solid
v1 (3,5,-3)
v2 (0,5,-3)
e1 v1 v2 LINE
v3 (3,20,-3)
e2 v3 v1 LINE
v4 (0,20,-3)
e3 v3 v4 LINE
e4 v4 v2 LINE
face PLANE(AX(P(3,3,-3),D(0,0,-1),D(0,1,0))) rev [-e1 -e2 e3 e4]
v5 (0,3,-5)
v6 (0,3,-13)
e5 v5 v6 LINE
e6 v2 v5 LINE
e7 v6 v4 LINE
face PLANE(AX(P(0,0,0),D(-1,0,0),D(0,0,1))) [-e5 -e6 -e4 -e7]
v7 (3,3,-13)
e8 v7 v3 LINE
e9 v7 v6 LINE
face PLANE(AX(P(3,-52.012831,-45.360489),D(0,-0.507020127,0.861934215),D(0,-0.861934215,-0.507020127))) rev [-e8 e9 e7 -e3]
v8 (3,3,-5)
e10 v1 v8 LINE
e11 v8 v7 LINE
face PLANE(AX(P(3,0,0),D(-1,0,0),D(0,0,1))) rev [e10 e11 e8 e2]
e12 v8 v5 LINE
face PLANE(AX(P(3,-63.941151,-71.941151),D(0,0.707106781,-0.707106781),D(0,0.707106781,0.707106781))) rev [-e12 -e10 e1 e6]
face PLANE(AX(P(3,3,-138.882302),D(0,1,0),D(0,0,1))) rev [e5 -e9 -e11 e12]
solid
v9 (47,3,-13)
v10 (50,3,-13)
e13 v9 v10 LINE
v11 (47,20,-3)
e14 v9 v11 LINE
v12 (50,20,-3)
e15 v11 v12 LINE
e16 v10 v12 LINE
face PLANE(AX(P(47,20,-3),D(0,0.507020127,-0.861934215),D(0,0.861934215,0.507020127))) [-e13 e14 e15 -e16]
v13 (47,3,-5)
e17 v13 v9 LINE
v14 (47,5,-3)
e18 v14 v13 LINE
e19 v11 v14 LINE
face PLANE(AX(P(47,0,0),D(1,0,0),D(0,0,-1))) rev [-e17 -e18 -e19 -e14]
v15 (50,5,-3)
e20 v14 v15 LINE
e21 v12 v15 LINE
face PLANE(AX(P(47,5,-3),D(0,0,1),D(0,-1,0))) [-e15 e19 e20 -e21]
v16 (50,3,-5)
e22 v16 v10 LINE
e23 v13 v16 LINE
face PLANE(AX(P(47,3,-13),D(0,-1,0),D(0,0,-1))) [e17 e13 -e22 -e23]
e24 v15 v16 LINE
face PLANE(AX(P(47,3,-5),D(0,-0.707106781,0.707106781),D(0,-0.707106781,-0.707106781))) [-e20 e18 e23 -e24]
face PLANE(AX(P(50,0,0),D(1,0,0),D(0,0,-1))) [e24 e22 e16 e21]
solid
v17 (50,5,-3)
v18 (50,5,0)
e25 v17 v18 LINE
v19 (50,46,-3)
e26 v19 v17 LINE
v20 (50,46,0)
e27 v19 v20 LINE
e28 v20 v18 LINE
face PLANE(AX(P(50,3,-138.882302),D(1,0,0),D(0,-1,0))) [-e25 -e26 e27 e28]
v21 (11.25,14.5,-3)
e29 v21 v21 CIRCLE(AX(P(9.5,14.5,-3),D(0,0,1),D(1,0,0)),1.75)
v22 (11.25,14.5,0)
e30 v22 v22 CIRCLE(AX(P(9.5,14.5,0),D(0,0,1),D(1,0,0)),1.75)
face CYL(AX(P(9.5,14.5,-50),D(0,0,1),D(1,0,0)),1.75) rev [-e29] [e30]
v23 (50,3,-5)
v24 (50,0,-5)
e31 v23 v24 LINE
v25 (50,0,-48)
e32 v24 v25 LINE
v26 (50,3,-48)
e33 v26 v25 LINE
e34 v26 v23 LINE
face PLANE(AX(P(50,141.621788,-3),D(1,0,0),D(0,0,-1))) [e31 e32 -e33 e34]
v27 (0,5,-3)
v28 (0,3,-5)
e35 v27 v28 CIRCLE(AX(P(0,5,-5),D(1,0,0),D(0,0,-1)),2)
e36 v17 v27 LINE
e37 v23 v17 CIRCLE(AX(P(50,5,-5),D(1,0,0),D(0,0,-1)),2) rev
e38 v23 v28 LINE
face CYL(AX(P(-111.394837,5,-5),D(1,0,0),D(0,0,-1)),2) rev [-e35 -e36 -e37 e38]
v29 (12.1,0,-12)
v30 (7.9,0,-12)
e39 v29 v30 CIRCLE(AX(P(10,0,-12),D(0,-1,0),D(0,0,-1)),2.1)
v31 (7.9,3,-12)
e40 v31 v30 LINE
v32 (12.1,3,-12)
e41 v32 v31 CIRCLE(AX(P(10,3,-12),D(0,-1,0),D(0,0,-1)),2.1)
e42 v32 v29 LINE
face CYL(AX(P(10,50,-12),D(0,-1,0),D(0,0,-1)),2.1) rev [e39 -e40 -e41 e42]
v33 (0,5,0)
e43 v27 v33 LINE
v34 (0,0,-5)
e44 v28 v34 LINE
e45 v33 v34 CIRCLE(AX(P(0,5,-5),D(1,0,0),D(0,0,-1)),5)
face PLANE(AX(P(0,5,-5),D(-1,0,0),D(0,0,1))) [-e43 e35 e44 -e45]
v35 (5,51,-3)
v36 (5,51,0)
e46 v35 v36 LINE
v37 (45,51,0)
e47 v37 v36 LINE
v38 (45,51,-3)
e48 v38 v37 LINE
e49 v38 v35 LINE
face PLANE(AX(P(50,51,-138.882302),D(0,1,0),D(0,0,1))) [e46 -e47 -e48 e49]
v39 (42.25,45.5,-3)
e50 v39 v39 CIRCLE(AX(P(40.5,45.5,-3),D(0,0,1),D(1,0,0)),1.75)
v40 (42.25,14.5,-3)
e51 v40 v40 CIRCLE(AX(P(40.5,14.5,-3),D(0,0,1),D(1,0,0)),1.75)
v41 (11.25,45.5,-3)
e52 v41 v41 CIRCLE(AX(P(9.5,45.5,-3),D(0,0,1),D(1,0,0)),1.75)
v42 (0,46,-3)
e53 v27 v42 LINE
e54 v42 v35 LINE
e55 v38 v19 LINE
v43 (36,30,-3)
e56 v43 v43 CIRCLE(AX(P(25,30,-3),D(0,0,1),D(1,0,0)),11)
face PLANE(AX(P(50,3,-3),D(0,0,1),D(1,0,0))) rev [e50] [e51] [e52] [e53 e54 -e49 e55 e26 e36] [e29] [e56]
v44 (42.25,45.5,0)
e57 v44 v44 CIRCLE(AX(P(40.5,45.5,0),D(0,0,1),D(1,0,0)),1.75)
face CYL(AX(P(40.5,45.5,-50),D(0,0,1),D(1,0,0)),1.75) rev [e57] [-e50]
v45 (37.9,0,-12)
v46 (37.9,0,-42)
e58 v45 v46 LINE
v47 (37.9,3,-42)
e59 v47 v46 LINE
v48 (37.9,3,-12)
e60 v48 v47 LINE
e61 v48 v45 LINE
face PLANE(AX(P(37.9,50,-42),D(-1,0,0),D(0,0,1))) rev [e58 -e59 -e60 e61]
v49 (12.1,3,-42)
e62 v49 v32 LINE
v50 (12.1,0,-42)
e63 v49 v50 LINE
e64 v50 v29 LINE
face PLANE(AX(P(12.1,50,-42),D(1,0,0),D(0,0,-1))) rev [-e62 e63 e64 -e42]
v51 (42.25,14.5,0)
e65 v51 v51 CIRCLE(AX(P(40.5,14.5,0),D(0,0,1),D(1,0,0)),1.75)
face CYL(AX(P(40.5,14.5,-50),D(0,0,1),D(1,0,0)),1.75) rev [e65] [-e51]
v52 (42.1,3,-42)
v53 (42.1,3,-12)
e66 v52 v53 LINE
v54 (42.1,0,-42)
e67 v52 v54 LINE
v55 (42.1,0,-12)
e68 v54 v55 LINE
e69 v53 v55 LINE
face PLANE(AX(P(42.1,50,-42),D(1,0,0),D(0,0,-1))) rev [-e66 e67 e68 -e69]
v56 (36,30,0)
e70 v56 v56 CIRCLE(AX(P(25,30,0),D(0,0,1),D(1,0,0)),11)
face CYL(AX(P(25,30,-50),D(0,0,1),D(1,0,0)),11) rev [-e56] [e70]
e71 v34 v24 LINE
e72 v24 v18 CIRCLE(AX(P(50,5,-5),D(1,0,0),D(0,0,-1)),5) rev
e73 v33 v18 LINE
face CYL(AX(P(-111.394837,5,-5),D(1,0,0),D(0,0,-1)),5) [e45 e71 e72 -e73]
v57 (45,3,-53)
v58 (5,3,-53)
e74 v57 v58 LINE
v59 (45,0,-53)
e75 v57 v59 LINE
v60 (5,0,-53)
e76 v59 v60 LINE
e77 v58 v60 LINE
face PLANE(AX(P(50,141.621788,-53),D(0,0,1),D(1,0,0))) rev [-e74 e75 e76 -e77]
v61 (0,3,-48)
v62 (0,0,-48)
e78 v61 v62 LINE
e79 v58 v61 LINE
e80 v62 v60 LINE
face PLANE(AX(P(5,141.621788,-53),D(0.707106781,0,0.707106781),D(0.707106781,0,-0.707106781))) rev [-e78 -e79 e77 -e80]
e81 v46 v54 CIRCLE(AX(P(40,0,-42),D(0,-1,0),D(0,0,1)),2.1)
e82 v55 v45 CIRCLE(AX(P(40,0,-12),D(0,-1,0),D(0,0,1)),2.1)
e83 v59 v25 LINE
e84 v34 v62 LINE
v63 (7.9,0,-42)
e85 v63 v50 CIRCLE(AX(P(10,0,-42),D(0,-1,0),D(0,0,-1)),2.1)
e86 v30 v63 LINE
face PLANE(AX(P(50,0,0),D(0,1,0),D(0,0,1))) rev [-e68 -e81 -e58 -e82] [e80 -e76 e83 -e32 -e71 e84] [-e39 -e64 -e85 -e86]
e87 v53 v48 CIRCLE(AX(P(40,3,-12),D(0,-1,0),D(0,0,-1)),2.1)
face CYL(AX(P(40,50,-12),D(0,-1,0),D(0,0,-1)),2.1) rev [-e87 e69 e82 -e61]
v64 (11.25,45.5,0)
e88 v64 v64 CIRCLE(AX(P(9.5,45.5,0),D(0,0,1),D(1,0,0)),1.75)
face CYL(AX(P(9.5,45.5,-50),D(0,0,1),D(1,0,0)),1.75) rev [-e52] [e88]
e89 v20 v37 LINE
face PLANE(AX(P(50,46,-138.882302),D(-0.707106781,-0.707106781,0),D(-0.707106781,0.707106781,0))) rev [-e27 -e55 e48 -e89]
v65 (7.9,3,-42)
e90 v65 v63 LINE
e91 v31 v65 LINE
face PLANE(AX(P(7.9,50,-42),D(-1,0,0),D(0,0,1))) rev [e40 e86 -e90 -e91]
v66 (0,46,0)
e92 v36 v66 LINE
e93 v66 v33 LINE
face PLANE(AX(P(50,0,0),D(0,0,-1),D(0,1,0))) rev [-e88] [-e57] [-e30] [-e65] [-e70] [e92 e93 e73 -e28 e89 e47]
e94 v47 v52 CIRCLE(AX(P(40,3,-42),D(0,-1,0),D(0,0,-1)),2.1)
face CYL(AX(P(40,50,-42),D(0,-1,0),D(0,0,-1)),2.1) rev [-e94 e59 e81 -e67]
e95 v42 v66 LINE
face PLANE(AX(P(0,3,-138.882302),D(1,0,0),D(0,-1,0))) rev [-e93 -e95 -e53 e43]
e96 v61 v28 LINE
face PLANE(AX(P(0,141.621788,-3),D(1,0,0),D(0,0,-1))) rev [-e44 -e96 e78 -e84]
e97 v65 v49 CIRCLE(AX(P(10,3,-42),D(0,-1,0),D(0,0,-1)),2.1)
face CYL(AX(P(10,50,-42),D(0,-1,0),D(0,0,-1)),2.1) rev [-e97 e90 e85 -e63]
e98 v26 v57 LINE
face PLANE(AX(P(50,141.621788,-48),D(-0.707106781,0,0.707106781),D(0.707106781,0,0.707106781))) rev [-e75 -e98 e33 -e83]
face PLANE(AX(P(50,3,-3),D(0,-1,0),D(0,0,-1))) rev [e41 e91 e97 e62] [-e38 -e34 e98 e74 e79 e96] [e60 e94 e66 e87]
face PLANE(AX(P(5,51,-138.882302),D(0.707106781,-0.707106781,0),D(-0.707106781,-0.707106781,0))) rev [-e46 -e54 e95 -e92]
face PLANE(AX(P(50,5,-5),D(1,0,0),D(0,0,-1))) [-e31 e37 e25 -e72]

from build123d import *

# Parameters (mm, degrees)
BOSS_EXTRUDE2_DEPTH          = 50
SKETCH4_R                    = 11
SKETCH4_R_2                  = 1.75
CUT_EXTRUDE1_DEPTH           = 50
CHAMFER1_SIZE                = 5
CUT_EXTRUDE2_DEPTH           = 50
FLATTEN_BENDS1_START         = 3
FLATTEN_BENDS1_OUTLINE_W     = 50
FLATTEN_BENDS1_OUTLINE_H     = 3
FLATTEN_BENDS1_DEPTH         = 48
FLATTEN_BENDS1_2_OUTLINE_R   = 1.75
FLATTEN_BENDS1_2_OUTLINE_R_2 = 11
FLATTEN_BENDS1_2_DEPTH       = 3
PROCESS_BENDS1_START         = -0.067055507
PROCESS_BENDS1_OUTLINE_W     = 50
PROCESS_BENDS1_OUTLINE_H     = 3
PROCESS_BENDS1_DEPTH         = 46.564842651
PROCESS_BENDS1_START_2       = -3
PROCESS_BENDS1_2_OUTLINE_R   = 1.75
PROCESS_BENDS1_2_OUTLINE_R_2 = 11
PROCESS_BENDS1_2_DEPTH       = 2.5137
PROCESS_BENDS1_START_3       = -5
PROCESS_BENDS1_3_OUTLINE_R   = 1.75
PROCESS_BENDS1_3_OUTLINE_R_2 = 11
PROCESS_BENDS1_3_DEPTH       = 5
PROCESS_BENDS1_4_DEPTH       = 50
BOSS_EXTRUDE3_DEPTH          = 3
BOSS_EXTRUDE4_START          = -50
BOSS_EXTRUDE4_DEPTH          = 3


with BuildPart() as part:
    # Sketch3 → Boss-Extrude2 (new body)
    with BuildSketch(Plane(origin=(0, 0, 0), x_dir=(0, 0, -1), z_dir=(1, 0, 0))):
        Polygon((0, 0), (0, 51), (3, 51), (3, 3), (53, 3), (53, 0), align=None)
    extrude(amount=BOSS_EXTRUDE2_DEPTH)

    # Sketch4 → Cut-Extrude1 (cut)
    with BuildSketch(Plane.XY):
        with Locations((25, 30)):
            Circle(SKETCH4_R)
        with Locations((9.5, 45.5)):
            Circle(SKETCH4_R_2)
        with Locations((40.5, 45.5)):
            Circle(SKETCH4_R_2)
        with Locations((40.5, 14.5)):
            Circle(SKETCH4_R_2)
        with Locations((9.5, 14.5)):
            Circle(SKETCH4_R_2)
    extrude(amount=-CUT_EXTRUDE1_DEPTH, mode=Mode.SUBTRACT)

    # Chamfer1
    chamfer1_edges = [part.edges().sort_by_distance(p)[0] for p in [
        (50, 51, -1.5),
        (0, 51, -1.5),
        (0, 1.5, -53),
        (50, 1.5, -53),
    ]]
    chamfer(chamfer1_edges, length=CHAMFER1_SIZE)

    # Sketch7 → Cut-Extrude2 (cut)
    with BuildSketch(Plane.XZ):
        with BuildLine():
            Line((7.9, -42), (7.9, -12))
            ThreePointArc((7.9, -12), (10, -9.9), (12.1, -12))
            Line((12.1, -12), (12.1, -42))
            ThreePointArc((12.1, -42), (10, -44.1), (7.9, -42))
        make_face()
        with BuildLine():
            Line((42.1, -42), (42.1, -12))
            ThreePointArc((42.1, -12), (40, -9.9), (37.9, -12))
            Line((37.9, -12), (37.9, -42))
            ThreePointArc((37.9, -42), (40, -44.1), (42.1, -42))
        make_face()
    extrude(amount=-CUT_EXTRUDE2_DEPTH, mode=Mode.SUBTRACT)

    # Flatten-Bends1: read off the stored shape, not the designer's step
    # Flatten-Bends1 outline → Flatten-Bends1 (cut)
    with BuildSketch(Plane(origin=(0, 0, 0), x_dir=(1, 0, 0), z_dir=(0, 1, 0)).offset(FLATTEN_BENDS1_START)):
        with Locations((25, 1.5)):
            Rectangle(FLATTEN_BENDS1_OUTLINE_W, FLATTEN_BENDS1_OUTLINE_H)
    extrude(amount=FLATTEN_BENDS1_DEPTH, mode=Mode.SUBTRACT)

    # Flatten-Bends1 2 outline → Flatten-Bends1 2 (add)
    with BuildSketch(Plane(origin=(0, 0, 0), x_dir=(1, 0, 0), z_dir=(0, 1, 0))):
        Polygon((0, 0), (0, -41.497787144), (5, -46.497787144), (45, -46.497787144), (50, -41.497787144), (50, 0), align=None)
        with Locations((9.5, -40.997787144)):
            Circle(FLATTEN_BENDS1_2_OUTLINE_R, mode=Mode.SUBTRACT)
        with Locations((40.5, -40.997787144)):
            Circle(FLATTEN_BENDS1_2_OUTLINE_R, mode=Mode.SUBTRACT)
        with Locations((25, -25.497787144)):
            Circle(FLATTEN_BENDS1_2_OUTLINE_R_2, mode=Mode.SUBTRACT)
        with Locations((9.5, -9.997787144)):
            Circle(FLATTEN_BENDS1_2_OUTLINE_R, mode=Mode.SUBTRACT)
        with Locations((40.5, -9.997787144)):
            Circle(FLATTEN_BENDS1_2_OUTLINE_R, mode=Mode.SUBTRACT)
    extrude(amount=FLATTEN_BENDS1_2_DEPTH)

    # Process-Bends1: read off the stored shape, not the designer's step
    # Process-Bends1 outline → Process-Bends1 (cut)
    with BuildSketch(Plane.XY.offset(PROCESS_BENDS1_START)):
        with Locations((25, 1.5)):
            Rectangle(PROCESS_BENDS1_OUTLINE_W, PROCESS_BENDS1_OUTLINE_H)
    extrude(amount=PROCESS_BENDS1_DEPTH, mode=Mode.SUBTRACT)

    # Process-Bends1 2 outline → Process-Bends1 2 (add)
    with BuildSketch(Plane.XY.offset(PROCESS_BENDS1_START_2)):
        Polygon((0, 46), (0, 3), (50, 3), (50, 46), (45, 51), (5, 51), align=None)
        with Locations((9.5, 14.5)):
            Circle(PROCESS_BENDS1_2_OUTLINE_R, mode=Mode.SUBTRACT)
        with Locations((40.5, 14.5)):
            Circle(PROCESS_BENDS1_2_OUTLINE_R, mode=Mode.SUBTRACT)
        with Locations((9.5, 45.5)):
            Circle(PROCESS_BENDS1_2_OUTLINE_R, mode=Mode.SUBTRACT)
        with Locations((25, 30)):
            Circle(PROCESS_BENDS1_2_OUTLINE_R_2, mode=Mode.SUBTRACT)
        with Locations((40.5, 45.5)):
            Circle(PROCESS_BENDS1_2_OUTLINE_R, mode=Mode.SUBTRACT)
    extrude(amount=PROCESS_BENDS1_2_DEPTH)

    # Process-Bends1 3 outline → Process-Bends1 3 (add)
    with BuildSketch(Plane.XY.offset(PROCESS_BENDS1_START_3)):
        Polygon((0, 46), (0, 3), (50, 3), (50, 46), (45, 51), (5, 51), align=None)
        with Locations((9.5, 14.5)):
            Circle(PROCESS_BENDS1_3_OUTLINE_R, mode=Mode.SUBTRACT)
        with Locations((40.5, 14.5)):
            Circle(PROCESS_BENDS1_3_OUTLINE_R, mode=Mode.SUBTRACT)
        with Locations((9.5, 45.5)):
            Circle(PROCESS_BENDS1_3_OUTLINE_R, mode=Mode.SUBTRACT)
        with Locations((25, 30)):
            Circle(PROCESS_BENDS1_3_OUTLINE_R_2, mode=Mode.SUBTRACT)
        with Locations((40.5, 45.5)):
            Circle(PROCESS_BENDS1_3_OUTLINE_R, mode=Mode.SUBTRACT)
    extrude(amount=PROCESS_BENDS1_3_DEPTH)

    # Process-Bends1 4 outline → Process-Bends1 4 (cut)
    with BuildSketch(Plane.YZ):
        with BuildLine():
            Line((51, -5), (51, -3))
            Line((51, -3), (5, -3))
            ThreePointArc((5, -3), (3.585786438, -3.585786438), (3, -5))
            Line((3, -5), (51, -5))
        make_face()
        with BuildLine():
            ThreePointArc((0, -5), (1.464466094, -1.464466094), (5, 0))
            Line((5, 0), (3, 0))
            Line((3, 0), (3, -0.067055507))
            Line((3, -0.067055507), (0, -0.067055507))
            Line((0, -0.067055507), (0, -5))
        make_face()
    extrude(amount=PROCESS_BENDS1_4_DEPTH, mode=Mode.SUBTRACT)


with BuildPart() as body_2:
    # Sketch14 → Boss-Extrude3 (new body)
    with BuildSketch(Plane(origin=(50, 0, 0), x_dir=(0, 0, -1), z_dir=(1, 0, 0))):
        Polygon((3, 20), (13, 3), (5, 3), (3, 5), align=None)
    extrude(amount=-BOSS_EXTRUDE3_DEPTH)


with BuildPart() as body_3:
    # Sketch14<2> → Boss-Extrude4 (new body)
    with BuildSketch(Plane(origin=(50, 0, 0), x_dir=(0, 0, -1), z_dir=(1, 0, 0)).offset(BOSS_EXTRUDE4_START)):
        Polygon((3, 20), (13, 3), (5, 3), (3, 5), align=None)
    extrude(amount=BOSS_EXTRUDE4_DEPTH)


solid = Compound([part.part, body_2.part, body_3.part])
